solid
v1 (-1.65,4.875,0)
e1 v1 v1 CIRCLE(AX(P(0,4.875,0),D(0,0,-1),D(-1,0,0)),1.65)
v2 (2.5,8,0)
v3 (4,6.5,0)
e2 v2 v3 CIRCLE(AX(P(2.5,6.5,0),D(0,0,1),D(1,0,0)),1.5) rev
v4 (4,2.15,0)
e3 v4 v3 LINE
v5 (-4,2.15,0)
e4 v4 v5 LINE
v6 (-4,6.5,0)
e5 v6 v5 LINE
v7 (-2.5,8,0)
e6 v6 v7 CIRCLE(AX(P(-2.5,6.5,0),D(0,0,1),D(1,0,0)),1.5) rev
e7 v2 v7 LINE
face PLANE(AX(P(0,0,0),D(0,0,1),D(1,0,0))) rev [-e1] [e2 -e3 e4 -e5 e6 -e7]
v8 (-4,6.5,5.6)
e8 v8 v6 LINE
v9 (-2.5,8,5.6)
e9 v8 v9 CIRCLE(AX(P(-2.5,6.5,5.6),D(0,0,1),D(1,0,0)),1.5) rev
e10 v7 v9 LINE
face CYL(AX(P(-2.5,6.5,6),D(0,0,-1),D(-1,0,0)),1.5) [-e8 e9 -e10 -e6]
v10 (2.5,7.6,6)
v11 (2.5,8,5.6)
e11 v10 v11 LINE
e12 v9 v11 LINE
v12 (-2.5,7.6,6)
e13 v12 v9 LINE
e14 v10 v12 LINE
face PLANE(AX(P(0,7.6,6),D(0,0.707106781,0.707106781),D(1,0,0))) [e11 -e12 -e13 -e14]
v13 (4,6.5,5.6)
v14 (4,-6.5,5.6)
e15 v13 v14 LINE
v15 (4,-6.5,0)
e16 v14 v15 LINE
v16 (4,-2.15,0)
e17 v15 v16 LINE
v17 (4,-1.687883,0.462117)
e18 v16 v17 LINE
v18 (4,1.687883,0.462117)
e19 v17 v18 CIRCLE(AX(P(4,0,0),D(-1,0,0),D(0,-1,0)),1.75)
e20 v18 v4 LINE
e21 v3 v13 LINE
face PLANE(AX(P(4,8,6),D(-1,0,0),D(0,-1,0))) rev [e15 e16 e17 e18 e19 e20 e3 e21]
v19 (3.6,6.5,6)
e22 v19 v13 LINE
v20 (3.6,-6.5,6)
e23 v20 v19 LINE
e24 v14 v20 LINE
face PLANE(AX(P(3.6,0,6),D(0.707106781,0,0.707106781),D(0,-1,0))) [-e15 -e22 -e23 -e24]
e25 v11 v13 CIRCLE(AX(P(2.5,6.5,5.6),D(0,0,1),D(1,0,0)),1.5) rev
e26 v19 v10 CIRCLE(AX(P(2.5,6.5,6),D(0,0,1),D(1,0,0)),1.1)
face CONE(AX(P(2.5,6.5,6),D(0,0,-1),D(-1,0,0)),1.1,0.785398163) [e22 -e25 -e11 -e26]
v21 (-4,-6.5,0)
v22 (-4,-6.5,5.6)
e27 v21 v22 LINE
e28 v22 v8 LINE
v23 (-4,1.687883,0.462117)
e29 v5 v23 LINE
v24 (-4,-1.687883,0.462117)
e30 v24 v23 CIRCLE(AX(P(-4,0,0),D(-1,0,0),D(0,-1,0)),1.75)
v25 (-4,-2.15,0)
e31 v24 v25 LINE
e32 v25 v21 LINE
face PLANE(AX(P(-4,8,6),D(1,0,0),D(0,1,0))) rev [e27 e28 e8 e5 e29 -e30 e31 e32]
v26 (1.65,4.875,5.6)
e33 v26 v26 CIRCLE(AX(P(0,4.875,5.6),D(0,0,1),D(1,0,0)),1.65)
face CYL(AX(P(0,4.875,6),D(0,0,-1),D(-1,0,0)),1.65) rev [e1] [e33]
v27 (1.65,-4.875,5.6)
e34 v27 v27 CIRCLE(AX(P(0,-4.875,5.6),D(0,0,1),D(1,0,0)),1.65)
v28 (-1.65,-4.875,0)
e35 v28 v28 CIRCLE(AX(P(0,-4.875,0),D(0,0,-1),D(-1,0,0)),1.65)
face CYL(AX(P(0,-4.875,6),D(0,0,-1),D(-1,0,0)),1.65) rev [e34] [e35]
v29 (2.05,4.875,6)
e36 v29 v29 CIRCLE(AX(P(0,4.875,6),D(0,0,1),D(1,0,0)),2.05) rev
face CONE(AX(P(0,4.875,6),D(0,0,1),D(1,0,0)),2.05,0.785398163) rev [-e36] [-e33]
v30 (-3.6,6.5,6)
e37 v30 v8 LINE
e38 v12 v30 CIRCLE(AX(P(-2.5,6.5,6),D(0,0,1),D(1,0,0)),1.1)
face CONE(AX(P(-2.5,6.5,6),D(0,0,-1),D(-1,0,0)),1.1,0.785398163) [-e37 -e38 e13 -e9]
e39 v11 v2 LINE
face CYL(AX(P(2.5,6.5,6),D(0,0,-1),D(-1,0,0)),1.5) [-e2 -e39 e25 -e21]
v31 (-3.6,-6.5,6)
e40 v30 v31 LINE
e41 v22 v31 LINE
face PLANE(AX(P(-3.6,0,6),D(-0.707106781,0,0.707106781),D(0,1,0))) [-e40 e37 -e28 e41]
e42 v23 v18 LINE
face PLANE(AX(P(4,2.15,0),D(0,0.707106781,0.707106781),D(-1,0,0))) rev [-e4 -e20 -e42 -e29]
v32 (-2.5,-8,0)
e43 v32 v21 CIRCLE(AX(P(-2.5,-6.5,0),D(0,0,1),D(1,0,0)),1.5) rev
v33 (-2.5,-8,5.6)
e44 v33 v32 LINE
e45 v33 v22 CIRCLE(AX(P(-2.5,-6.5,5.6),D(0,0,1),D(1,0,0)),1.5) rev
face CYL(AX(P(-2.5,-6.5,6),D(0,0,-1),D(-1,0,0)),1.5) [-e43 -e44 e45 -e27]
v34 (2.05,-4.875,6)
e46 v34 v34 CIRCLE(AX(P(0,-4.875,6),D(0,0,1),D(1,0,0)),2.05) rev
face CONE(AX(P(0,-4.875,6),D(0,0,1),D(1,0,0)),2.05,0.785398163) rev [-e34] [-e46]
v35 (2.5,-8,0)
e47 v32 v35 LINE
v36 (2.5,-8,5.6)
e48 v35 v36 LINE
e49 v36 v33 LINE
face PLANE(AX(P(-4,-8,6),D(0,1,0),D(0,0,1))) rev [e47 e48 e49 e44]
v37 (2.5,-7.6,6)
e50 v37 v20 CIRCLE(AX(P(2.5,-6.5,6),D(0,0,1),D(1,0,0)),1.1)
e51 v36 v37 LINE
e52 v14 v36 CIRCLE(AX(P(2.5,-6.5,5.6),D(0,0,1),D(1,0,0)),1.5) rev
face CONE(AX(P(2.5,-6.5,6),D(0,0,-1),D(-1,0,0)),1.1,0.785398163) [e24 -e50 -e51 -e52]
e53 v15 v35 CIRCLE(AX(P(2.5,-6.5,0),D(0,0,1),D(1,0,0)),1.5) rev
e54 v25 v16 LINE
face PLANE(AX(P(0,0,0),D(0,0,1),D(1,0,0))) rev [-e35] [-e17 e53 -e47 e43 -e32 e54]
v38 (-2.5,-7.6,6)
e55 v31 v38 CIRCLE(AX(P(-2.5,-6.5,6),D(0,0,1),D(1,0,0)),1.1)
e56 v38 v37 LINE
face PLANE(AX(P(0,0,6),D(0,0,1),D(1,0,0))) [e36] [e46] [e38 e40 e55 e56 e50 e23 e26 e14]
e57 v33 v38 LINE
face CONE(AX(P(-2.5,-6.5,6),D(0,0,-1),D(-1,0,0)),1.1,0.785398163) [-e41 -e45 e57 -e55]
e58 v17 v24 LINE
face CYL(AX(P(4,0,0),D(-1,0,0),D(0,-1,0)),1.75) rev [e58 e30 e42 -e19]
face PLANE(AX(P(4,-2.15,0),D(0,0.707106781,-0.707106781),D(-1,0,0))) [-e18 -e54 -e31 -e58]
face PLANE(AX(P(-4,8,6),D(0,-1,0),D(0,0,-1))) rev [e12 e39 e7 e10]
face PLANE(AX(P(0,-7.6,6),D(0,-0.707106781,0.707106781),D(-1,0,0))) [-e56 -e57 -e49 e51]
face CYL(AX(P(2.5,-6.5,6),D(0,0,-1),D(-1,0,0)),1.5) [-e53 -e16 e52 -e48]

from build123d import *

# Parameters (mm, degrees)
SKETCH2_W           = 8
SKETCH2_H           = 16
BOSS_EXTRUDE1_DEPTH = 6
CUT_EXTRUDE1_DEPTH  = 8
SKETCH4_R           = 1.65
CUT_EXTRUDE2_DEPTH  = 6
FILLET1_R           = 1.5
CHAMFER1_SIZE       = 0.4
CHAMFER2_SIZE       = 0.4


with BuildPart() as part:
    # Sketch2 → Boss-Extrude1 (new body)
    with BuildSketch(Plane.XY):
        Rectangle(SKETCH2_W, SKETCH2_H)
    extrude(amount=BOSS_EXTRUDE1_DEPTH)

    # Sketch3 → Cut-Extrude1 (cut)
    with BuildSketch(Plane.ZY.offset(4)):
        with BuildLine():
            ThreePointArc((0, 1.75), (-1.75, 0), (0, -1.75))
            Line((0, -1.75), (0, 1.75))
        make_face()
        with BuildLine():
            Line((0, 1.75), (0, -1.75))
            ThreePointArc((0, -1.75), (1.237436867, -1.237436867), (1.75, 0))
            ThreePointArc((1.75, 0), (1.237436867, 1.237436867), (0, 1.75))
        make_face()
    extrude(amount=-CUT_EXTRUDE1_DEPTH, mode=Mode.SUBTRACT)

    # Sketch4 → Cut-Extrude2 (cut)
    with BuildSketch(Plane(origin=(0, 0, 0), x_dir=(-1, 0, 0), z_dir=(0, 0, -1))):
        with Locations((0, -4.875)):
            Circle(SKETCH4_R)
        with Locations((0, 4.875)):
            Circle(SKETCH4_R)
    extrude(amount=-CUT_EXTRUDE2_DEPTH, mode=Mode.SUBTRACT)

    # Fillet1
    fillet1_edges = [part.edges().sort_by_distance(p)[0] for p in [
        (4, -8, 3),
        (-4, -8, 3),
        (-4, 8, 3),
        (4, 8, 3),
    ]]
    fillet(fillet1_edges, radius=FILLET1_R)

    # Chamfer1
    chamfer1_edges = [part.edges().sort_by_distance(p)[0] for p in [
        (1.65, -4.875, 6),
        (1.65, 4.875, 6),
        (4, 0, 6),
        (0, -8, 6),
        (0, 8, 6),
        (-4, 0, 6),
        (3.560660172, 7.560660172, 6),
        (-3.560660172, 7.560660172, 6),
        (-3.560660172, -7.560660172, 6),
        (3.560660172, -7.560660172, 6),
    ]]
    chamfer(chamfer1_edges, length=CHAMFER1_SIZE)

    # Chamfer2
    # the kernel refuses this chamfer: 0.4 mm, written as the material it takes off along each edge
    with BuildSketch(Plane(origin=(5.197730184, -1.75, 0), x_dir=(0, 0.1332210476636025, 0.9910863496484109), z_dir=(-1, 0, 0))) as chamfer2_piece_1:
        with BuildLine():
            Line((0.466273667, 0), (-CHAMFER2_SIZE * 0.133221047664, -CHAMFER2_SIZE * 0.991086349648))
            Line((-CHAMFER2_SIZE * 0.133221047664, -CHAMFER2_SIZE * 0.991086349648), (0, 0))
            ThreePointArc((0, 0), (0.23957204, -0.015587056), (0.466273667, 0))
        make_face()
    extrude(amount=10.395460367, mode=Mode.SUBTRACT)
    with BuildSketch(Plane(origin=(-5.197730184, 1.75, 0), x_dir=(0, 1, 0), z_dir=(1, 0, 0))) as chamfer2_piece_2:
        with BuildLine():
            Line((CHAMFER2_SIZE, 0), (-0.062117466, 0.462117466))
            ThreePointArc((-0.062117466, 0.462117466), (-0.01646792, 0.239513102), (0, 0))
            Line((0, 0), (CHAMFER2_SIZE, 0))
        make_face()
    extrude(amount=10.395460367, mode=Mode.SUBTRACT)


solid = part.part
